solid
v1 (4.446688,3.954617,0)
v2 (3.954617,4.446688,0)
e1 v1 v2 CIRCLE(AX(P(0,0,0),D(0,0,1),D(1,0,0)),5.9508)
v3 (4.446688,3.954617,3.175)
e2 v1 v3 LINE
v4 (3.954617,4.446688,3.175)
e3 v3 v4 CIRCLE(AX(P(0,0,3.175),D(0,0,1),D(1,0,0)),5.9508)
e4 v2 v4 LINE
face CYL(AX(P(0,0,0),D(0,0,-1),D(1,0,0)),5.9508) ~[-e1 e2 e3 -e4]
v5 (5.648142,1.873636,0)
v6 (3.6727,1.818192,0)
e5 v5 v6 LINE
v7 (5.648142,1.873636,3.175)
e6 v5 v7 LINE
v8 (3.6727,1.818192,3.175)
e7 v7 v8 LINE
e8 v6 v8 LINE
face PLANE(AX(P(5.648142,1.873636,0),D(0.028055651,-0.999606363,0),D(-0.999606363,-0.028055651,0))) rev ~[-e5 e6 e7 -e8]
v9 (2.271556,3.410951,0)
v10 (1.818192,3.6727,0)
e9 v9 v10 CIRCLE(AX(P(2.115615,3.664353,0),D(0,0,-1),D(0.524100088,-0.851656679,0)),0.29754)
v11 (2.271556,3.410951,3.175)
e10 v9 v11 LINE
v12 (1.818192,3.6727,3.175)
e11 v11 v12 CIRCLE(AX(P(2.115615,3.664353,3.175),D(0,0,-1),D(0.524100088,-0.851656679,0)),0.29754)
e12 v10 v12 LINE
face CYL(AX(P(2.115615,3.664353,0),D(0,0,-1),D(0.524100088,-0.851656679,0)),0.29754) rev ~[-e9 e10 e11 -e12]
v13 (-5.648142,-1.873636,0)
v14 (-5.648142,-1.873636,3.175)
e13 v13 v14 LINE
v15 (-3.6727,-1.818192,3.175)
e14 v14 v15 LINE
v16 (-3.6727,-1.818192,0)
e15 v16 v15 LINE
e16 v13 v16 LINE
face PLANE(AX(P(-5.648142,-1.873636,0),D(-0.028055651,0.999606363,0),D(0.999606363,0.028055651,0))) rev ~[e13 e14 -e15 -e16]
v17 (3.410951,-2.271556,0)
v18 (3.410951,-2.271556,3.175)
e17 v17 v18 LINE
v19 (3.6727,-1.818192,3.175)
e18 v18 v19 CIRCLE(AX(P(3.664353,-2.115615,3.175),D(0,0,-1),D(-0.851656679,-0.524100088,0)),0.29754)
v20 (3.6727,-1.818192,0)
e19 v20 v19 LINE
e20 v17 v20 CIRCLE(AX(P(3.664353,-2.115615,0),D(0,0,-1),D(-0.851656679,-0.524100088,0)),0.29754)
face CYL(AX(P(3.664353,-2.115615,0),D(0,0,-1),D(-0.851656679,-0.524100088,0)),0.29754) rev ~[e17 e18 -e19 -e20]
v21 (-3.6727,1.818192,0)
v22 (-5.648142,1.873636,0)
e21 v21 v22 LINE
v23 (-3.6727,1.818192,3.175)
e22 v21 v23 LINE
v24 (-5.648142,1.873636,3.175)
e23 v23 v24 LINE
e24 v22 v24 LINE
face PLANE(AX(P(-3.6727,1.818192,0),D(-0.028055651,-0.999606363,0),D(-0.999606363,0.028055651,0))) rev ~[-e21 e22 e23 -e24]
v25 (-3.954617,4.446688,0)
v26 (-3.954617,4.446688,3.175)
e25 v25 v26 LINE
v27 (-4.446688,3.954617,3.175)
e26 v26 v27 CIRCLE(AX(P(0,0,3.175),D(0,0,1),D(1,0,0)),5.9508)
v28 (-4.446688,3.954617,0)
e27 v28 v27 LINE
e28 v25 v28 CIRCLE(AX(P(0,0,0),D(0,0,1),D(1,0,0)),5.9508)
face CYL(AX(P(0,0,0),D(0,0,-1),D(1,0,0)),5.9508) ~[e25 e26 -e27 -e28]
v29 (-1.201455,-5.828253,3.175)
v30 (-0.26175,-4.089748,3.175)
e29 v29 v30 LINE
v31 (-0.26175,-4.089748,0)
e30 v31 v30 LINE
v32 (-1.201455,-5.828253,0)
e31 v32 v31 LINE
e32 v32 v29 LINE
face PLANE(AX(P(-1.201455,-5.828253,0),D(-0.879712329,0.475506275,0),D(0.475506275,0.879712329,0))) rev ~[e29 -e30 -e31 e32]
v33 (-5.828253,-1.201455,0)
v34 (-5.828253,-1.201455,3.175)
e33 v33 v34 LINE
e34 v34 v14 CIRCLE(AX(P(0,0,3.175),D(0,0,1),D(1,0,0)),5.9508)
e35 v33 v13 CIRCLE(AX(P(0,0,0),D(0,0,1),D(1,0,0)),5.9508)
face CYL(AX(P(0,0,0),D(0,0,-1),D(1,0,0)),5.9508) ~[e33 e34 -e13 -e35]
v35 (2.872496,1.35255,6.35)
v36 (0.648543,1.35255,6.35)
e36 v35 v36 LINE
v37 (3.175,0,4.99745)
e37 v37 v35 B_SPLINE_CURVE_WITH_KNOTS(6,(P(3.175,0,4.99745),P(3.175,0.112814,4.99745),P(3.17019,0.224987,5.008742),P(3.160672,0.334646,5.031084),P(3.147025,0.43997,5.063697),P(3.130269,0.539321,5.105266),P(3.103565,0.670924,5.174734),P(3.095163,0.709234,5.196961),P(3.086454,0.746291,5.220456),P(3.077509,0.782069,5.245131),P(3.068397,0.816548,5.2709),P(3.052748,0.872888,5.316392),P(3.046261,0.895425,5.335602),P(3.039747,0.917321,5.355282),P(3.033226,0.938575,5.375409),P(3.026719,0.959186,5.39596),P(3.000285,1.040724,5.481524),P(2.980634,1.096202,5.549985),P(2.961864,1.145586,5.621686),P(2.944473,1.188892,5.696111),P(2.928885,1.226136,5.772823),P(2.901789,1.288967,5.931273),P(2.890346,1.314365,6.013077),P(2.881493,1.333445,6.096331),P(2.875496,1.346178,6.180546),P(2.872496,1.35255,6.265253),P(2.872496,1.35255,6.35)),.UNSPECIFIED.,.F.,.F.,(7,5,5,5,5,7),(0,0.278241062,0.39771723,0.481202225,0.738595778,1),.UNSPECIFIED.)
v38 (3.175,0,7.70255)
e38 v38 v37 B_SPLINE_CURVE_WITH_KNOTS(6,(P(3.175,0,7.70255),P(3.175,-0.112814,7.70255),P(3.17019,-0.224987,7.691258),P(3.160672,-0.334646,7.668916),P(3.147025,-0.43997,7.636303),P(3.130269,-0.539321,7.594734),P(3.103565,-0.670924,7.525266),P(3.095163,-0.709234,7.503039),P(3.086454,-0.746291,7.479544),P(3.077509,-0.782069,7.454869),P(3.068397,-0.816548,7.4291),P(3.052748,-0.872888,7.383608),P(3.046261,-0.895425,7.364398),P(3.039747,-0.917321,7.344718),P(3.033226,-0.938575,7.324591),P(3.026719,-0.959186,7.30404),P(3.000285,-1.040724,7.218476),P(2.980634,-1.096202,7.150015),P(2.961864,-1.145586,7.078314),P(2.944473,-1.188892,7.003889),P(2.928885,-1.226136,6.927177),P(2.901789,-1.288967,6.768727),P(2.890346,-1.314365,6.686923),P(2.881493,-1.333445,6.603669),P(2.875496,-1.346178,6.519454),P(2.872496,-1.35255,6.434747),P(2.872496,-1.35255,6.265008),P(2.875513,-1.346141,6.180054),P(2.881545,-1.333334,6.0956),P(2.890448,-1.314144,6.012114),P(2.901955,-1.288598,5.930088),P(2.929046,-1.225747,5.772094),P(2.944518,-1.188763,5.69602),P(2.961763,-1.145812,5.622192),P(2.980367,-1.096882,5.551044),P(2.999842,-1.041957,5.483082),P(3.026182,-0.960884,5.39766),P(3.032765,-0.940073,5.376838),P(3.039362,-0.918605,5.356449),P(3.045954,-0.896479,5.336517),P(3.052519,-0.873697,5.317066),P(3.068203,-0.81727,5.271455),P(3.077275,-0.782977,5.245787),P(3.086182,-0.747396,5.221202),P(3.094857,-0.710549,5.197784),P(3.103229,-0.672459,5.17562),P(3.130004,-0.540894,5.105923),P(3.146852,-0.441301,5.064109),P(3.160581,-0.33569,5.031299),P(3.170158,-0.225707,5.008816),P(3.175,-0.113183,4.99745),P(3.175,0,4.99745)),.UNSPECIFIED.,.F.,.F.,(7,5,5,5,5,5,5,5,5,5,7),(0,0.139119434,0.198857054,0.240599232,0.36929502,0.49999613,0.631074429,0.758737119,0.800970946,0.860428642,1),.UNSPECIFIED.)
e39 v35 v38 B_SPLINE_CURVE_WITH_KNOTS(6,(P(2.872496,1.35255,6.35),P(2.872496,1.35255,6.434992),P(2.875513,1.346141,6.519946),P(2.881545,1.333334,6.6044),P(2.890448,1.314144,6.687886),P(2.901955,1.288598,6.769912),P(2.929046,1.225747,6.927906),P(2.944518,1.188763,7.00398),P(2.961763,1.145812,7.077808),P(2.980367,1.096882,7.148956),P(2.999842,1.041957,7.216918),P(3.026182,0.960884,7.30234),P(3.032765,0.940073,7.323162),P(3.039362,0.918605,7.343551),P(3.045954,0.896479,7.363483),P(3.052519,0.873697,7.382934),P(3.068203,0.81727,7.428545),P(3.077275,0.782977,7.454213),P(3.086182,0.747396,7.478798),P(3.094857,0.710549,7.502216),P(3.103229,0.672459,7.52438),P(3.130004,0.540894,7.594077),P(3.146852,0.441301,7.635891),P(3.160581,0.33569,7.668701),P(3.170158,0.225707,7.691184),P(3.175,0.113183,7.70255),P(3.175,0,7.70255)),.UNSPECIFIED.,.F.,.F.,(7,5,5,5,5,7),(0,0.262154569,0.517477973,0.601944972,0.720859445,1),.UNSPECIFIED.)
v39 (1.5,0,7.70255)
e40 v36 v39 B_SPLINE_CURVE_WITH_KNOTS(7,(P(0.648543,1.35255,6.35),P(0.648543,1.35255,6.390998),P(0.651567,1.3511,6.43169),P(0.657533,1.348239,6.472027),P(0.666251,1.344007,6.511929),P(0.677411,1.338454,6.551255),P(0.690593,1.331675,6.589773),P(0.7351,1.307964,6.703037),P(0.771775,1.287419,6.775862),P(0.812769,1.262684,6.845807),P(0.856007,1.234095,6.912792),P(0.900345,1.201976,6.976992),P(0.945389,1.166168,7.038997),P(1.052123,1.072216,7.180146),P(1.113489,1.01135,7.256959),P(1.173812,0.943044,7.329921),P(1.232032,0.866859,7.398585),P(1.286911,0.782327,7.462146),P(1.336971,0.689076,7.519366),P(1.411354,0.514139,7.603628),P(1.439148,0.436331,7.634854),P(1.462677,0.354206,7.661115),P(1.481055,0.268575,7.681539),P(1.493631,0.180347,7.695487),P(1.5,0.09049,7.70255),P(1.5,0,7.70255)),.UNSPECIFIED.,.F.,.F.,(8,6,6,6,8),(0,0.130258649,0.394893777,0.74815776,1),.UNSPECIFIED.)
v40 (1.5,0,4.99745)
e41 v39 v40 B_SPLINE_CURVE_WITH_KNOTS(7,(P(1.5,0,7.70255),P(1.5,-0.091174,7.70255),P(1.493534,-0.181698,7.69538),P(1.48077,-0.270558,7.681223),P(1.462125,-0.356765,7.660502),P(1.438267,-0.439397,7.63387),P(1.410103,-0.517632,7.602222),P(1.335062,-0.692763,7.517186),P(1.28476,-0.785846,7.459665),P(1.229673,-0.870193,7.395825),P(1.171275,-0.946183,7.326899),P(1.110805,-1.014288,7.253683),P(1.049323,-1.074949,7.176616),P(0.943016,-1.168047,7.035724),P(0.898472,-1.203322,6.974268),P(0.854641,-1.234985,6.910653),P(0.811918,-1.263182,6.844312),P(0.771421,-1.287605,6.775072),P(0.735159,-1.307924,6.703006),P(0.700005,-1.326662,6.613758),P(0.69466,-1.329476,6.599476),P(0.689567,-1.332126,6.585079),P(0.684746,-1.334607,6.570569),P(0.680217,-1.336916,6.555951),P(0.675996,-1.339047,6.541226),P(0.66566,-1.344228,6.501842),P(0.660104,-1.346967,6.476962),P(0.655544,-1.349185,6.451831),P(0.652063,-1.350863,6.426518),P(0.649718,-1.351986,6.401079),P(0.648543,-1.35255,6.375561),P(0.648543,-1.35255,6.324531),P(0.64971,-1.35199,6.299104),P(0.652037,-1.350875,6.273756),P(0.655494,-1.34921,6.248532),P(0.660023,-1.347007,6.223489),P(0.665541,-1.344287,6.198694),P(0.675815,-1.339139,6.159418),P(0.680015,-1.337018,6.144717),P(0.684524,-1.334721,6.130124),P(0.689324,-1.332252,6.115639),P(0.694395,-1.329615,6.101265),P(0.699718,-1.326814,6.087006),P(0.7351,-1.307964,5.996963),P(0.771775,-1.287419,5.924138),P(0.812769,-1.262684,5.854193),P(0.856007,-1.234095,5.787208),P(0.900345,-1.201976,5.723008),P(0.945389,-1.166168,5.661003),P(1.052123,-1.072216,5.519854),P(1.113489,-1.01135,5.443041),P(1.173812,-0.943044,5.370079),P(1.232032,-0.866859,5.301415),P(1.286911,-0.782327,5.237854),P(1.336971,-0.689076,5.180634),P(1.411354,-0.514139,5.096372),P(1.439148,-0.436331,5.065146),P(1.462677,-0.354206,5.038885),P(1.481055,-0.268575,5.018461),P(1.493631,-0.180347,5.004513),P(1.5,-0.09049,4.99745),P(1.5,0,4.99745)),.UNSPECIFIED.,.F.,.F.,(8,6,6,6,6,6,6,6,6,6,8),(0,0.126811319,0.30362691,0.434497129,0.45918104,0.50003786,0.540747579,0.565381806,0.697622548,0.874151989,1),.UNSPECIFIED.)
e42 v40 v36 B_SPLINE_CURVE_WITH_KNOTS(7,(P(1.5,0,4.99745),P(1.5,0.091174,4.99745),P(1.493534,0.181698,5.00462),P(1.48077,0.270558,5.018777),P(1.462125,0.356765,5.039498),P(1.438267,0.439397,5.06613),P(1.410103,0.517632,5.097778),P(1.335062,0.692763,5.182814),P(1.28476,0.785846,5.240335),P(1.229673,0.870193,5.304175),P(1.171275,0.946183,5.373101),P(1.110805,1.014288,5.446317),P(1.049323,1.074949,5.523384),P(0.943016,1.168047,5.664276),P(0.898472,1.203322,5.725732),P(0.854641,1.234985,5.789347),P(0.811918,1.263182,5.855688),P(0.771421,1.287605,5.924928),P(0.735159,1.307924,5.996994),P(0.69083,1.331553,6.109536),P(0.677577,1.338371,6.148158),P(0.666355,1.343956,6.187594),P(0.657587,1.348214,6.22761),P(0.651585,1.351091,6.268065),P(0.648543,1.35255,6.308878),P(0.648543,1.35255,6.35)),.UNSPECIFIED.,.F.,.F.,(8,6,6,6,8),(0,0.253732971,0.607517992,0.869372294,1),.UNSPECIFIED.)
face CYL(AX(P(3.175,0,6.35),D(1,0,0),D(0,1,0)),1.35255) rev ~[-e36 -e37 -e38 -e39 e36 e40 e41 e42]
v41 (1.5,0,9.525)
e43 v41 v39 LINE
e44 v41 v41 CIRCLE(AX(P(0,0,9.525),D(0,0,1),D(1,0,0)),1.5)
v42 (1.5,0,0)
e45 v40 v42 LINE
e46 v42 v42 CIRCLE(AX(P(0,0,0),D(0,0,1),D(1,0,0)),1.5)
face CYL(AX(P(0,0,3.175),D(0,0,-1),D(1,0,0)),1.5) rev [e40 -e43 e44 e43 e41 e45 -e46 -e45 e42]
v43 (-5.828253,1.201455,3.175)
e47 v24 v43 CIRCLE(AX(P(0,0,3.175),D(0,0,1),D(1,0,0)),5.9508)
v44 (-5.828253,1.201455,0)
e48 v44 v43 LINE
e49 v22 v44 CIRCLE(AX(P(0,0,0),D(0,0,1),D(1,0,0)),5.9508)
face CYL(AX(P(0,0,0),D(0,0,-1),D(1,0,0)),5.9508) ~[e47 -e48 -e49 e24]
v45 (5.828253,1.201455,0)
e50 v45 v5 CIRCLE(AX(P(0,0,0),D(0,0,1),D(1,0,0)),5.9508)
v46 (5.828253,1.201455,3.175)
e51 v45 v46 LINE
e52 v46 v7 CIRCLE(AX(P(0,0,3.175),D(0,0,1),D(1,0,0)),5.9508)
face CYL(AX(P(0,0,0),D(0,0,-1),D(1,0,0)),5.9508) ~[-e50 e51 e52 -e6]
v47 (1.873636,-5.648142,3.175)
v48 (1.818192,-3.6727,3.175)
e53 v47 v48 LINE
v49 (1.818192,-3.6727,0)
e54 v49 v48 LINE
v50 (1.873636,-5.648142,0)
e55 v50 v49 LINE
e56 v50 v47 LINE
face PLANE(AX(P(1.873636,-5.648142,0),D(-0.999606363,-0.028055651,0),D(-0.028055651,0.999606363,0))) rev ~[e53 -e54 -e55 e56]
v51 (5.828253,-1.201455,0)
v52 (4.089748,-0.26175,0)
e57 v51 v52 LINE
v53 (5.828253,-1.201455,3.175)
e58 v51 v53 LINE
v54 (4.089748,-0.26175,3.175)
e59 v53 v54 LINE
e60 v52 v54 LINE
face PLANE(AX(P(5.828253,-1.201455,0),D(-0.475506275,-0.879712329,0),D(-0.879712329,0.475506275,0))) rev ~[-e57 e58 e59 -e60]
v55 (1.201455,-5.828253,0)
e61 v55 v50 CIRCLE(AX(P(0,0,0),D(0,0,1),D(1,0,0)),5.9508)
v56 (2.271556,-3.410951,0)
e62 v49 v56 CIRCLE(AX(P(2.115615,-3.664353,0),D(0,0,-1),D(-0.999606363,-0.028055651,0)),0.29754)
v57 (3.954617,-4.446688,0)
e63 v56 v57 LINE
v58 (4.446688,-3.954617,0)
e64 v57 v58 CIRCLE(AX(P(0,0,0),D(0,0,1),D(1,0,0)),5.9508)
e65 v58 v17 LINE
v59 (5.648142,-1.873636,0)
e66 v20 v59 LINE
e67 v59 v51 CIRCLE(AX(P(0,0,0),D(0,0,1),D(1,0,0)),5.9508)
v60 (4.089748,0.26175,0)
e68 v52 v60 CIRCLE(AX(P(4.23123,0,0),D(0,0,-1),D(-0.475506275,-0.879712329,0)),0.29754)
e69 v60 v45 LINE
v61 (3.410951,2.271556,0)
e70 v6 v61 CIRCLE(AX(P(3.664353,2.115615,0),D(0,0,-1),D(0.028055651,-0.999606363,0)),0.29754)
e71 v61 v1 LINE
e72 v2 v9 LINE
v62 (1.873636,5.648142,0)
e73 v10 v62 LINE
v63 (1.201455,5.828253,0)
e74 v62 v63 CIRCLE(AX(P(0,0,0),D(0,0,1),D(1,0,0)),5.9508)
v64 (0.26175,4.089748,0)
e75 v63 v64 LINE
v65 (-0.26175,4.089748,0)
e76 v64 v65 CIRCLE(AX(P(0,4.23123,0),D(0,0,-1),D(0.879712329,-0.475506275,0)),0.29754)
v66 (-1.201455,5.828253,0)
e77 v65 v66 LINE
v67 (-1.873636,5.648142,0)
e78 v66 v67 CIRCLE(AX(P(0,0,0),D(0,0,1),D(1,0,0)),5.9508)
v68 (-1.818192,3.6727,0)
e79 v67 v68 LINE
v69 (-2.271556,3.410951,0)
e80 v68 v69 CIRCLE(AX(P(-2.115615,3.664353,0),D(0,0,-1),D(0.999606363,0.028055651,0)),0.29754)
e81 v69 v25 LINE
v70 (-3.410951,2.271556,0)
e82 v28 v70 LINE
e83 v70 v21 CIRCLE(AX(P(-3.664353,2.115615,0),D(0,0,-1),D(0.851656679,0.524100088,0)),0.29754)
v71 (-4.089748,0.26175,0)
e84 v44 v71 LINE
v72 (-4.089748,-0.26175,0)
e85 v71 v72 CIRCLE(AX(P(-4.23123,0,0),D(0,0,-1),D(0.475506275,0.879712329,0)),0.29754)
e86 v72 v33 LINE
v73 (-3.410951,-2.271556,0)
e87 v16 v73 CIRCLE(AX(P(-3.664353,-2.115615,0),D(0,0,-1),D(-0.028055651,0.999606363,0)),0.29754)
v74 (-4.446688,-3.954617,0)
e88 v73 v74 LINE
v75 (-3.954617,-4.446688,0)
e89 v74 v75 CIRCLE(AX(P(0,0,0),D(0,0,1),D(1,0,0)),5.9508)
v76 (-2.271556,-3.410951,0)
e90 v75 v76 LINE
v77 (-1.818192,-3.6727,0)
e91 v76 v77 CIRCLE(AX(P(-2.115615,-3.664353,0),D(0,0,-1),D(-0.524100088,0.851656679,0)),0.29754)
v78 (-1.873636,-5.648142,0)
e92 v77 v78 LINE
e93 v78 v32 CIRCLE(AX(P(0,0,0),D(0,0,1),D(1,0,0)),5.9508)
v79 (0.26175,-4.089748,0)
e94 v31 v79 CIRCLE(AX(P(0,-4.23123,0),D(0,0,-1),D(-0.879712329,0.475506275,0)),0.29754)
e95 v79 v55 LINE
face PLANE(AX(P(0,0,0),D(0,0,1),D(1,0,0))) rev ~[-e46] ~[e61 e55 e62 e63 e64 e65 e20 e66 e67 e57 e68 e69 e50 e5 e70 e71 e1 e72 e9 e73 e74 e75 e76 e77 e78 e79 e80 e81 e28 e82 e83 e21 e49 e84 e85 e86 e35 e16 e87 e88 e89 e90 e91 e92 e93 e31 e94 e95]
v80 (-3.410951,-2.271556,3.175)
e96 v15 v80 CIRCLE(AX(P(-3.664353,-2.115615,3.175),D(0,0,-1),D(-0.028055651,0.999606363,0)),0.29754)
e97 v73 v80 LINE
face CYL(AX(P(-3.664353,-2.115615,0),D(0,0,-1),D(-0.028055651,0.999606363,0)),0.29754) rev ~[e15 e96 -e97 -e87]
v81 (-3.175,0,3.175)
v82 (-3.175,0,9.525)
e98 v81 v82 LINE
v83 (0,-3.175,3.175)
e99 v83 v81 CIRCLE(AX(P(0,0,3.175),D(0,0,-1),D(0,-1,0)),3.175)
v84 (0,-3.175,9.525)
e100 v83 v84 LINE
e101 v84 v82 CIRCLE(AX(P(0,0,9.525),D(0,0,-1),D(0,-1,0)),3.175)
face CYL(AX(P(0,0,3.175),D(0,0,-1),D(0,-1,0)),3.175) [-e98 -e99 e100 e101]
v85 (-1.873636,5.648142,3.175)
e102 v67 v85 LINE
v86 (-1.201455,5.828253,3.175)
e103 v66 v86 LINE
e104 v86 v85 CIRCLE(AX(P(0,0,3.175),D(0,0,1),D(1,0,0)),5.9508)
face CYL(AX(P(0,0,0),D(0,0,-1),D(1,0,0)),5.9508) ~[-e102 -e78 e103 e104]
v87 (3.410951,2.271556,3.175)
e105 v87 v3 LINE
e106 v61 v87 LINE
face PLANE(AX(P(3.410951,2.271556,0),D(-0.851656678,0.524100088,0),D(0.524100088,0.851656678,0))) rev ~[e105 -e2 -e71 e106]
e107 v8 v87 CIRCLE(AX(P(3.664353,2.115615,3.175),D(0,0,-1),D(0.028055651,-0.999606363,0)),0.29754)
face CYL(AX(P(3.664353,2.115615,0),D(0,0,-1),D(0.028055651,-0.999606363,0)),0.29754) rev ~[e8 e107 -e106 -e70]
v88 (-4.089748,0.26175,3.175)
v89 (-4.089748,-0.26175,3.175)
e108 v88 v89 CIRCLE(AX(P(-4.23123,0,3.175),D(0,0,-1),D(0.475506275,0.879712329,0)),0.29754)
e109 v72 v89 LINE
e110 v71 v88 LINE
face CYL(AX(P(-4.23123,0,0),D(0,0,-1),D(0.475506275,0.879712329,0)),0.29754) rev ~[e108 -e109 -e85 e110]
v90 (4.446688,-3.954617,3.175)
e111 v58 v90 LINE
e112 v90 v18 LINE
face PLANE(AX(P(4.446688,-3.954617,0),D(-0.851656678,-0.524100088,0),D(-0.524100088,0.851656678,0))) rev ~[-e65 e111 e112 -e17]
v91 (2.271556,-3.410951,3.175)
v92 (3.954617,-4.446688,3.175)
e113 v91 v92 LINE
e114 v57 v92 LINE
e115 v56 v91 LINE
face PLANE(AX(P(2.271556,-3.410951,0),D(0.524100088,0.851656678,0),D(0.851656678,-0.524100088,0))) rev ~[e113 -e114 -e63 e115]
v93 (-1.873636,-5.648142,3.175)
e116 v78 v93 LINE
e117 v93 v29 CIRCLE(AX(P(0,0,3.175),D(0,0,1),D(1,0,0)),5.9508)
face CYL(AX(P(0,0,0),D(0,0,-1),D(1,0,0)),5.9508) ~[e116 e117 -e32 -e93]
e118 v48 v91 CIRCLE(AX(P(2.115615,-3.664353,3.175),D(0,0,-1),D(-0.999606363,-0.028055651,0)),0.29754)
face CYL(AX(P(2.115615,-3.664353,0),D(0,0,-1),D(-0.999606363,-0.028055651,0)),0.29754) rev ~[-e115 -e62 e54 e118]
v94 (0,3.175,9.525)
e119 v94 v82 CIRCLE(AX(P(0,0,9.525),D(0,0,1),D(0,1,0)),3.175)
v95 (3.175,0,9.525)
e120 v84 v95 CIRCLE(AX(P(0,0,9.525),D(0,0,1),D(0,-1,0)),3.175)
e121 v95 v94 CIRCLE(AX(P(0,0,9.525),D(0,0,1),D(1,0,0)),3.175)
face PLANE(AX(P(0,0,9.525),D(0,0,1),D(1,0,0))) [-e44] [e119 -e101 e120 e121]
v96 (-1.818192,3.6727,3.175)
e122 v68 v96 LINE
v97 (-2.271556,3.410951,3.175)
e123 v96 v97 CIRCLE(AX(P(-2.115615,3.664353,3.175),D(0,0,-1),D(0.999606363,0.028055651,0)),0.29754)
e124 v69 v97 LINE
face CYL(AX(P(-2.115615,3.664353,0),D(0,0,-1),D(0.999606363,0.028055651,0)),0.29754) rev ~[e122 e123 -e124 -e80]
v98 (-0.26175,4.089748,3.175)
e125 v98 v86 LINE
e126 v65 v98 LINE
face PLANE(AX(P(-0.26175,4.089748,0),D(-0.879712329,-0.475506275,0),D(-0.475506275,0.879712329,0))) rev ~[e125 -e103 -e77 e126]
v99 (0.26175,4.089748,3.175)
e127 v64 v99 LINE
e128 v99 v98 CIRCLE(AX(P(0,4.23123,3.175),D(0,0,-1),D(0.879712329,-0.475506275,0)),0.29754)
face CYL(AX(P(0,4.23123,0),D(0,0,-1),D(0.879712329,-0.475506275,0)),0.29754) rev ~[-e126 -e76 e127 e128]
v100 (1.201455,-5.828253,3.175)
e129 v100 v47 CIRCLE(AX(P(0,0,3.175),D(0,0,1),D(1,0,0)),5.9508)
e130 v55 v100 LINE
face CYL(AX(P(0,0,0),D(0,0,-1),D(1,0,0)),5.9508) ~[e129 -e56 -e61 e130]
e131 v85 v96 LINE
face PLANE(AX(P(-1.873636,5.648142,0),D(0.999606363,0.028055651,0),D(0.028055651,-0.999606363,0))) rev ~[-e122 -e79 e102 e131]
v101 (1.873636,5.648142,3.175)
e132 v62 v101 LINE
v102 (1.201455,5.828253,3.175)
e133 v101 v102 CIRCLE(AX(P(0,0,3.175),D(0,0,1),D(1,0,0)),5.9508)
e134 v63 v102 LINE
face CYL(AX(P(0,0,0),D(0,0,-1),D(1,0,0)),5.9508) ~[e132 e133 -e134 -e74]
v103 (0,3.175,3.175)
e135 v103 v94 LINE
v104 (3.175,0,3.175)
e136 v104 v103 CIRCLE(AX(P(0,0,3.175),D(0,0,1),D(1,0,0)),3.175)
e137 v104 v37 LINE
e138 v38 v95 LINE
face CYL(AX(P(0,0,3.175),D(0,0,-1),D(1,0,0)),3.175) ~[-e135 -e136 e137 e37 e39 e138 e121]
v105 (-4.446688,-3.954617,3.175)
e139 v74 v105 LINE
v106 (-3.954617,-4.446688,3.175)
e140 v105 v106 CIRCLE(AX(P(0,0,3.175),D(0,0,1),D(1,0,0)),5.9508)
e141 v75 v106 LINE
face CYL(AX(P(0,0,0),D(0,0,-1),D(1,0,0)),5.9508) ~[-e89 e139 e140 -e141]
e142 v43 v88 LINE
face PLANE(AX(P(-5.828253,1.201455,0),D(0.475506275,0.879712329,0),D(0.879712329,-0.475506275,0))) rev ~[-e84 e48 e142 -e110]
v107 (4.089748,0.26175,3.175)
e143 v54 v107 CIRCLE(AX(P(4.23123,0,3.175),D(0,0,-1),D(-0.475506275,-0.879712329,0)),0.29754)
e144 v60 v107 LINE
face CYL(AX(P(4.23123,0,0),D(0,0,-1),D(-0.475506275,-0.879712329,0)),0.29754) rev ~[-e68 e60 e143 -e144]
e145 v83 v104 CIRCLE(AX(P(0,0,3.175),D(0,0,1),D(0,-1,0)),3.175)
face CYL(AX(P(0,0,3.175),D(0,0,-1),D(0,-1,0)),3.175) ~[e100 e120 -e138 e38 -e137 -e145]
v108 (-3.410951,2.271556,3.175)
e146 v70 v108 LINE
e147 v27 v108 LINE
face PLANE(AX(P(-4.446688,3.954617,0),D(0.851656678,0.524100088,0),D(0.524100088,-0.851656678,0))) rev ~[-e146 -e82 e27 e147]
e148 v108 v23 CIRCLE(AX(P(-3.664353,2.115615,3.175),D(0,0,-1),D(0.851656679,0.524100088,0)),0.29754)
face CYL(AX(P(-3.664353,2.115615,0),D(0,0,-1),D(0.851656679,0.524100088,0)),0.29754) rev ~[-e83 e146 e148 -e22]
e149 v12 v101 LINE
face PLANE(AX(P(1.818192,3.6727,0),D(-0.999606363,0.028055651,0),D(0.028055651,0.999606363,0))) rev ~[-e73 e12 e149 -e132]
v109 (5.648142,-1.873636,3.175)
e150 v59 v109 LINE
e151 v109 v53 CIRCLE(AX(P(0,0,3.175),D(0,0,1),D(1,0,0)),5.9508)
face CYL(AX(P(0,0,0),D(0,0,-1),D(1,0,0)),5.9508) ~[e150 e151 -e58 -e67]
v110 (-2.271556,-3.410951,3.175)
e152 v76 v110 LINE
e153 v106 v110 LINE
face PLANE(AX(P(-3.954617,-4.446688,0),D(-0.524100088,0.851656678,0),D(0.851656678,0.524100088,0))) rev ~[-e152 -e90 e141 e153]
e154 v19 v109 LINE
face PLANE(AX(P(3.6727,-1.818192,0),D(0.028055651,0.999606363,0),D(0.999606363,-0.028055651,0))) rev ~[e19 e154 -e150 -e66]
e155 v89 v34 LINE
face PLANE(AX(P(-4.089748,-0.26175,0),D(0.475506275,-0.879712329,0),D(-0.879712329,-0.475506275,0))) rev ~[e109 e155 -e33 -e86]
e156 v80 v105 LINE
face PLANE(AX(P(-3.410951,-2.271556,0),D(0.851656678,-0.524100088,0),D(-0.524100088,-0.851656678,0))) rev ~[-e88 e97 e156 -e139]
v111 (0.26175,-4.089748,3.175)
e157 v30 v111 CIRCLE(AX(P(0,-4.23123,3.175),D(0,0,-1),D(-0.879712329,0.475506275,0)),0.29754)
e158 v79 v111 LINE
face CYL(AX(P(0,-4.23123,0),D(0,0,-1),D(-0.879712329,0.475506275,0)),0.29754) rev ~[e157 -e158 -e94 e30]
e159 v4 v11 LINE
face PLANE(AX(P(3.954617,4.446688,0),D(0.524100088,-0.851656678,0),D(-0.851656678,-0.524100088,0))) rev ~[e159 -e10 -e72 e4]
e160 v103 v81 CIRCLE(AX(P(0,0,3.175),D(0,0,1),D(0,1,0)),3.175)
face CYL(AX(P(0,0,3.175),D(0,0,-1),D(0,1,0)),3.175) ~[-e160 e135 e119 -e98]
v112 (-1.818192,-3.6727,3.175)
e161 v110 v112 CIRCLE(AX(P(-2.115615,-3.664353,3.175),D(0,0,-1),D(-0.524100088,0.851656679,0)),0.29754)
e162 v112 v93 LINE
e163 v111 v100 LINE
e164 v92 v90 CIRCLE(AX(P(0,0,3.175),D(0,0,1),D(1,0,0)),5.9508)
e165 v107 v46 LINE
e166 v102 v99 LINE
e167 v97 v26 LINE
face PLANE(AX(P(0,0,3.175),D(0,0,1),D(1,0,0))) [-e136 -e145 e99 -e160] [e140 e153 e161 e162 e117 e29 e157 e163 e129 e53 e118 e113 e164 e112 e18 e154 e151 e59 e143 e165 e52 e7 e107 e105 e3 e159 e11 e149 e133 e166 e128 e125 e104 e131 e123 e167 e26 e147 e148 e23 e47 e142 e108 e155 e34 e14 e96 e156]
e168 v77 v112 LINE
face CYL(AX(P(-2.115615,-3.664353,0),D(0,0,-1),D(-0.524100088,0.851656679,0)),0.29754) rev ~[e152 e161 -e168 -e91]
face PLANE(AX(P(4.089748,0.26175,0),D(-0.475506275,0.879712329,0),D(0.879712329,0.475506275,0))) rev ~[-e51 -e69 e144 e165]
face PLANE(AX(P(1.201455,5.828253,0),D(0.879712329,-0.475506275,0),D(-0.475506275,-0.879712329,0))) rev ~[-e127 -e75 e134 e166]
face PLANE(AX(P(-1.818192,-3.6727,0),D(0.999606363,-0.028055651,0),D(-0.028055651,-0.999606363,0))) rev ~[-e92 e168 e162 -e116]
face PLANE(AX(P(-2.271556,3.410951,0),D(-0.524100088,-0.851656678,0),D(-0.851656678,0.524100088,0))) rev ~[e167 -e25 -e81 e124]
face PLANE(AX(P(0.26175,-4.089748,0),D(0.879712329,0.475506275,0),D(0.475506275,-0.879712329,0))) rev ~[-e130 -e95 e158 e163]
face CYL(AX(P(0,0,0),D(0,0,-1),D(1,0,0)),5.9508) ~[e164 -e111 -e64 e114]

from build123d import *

# Parameters (mm, degrees)
F0_R        = 5.9508004686
F0_R_2      = 1.5
F1_DEPTH    = 3.175
F2_W        = 6.35
F2_H        = 6.35
F2_R        = 1.5
F3_DEPTH    = 6.35
F4_R        = 1.35255
F5_REACH    = 12.9523895761
F6_T1_DEPTH = 6.35
F8_DEPTH    = 3.175
F9_COUNT    = 12
F9_ANGLE    = 330


# Not quite as in the source:
# - a fillet or chamfer that OpenCascade refuses, or shapes differently, is made with other operations: its cross-section is extruded or revolved along the edge and cut away or added


with BuildPart() as f1:
    # F0 (on Top) → F1 (new body)
    with BuildSketch(Plane.XY):
        Circle(F0_R)
        Circle(F0_R_2, mode=Mode.SUBTRACT)
    extrude(amount=F1_DEPTH)

    # F2 (on face) → F3 (join)
    with BuildSketch(Plane.XY.offset(3.175)):
        Rectangle(F2_W, F2_H)
        Circle(F2_R, mode=Mode.SUBTRACT)
    extrude(amount=F3_DEPTH)

    f5_end = f1.faces().sort_by_distance((-1.5, 0, 4.7625))[0]
    # F4 (on face) → F5 (cut, up to a face of the model that its end follows)
    with BuildSketch(Plane.YZ.offset(3.175)):
        with Locations((0, 6.35)):
            Circle(F4_R)
    f5_long = extrude(amount=-F5_REACH, mode=Mode.PRIVATE)
    add(split(f5_long, bisect_by=f5_end, keep=Keep.ALL, mode=Mode.PRIVATE).solids().sort_by_distance((3.175, 0, 6.35))[0], mode=Mode.SUBTRACT)

    # F6: fillet of radius 3.175 on 4 edges, made by hand

    # F6_s2 → F6_t1 (cut)
    with BuildSketch(Plane.XY.offset(3.175)):
        with BuildLine():
            ThreePointArc((0, -3.175), (2.2450640303, -2.2450640303), (3.175, 0))
            Line((3.175, 0), (3.2385, 0))
            Line((3.2385, 0), (3.2385, -3.2385))
            Line((3.2385, -3.2385), (0, -3.2385))
            Line((0, -3.2385), (0, -3.175))
        make_face()
        with BuildLine():
            ThreePointArc((0, -3.175), (-2.2450640303, -2.2450640303), (-3.175, 0))
            Line((-3.175, 0), (-3.2385, 0))
            Line((-3.2385, 0), (-3.2385, -3.2385))
            Line((-3.2385, -3.2385), (0, -3.2385))
            Line((0, -3.2385), (0, -3.175))
        make_face()
        with BuildLine():
            ThreePointArc((3.175, 0), (2.2450640303, 2.2450640303), (0, 3.175))
            Line((0, 3.175), (0, 3.2385))
            Line((0, 3.2385), (3.2385, 3.2385))
            Line((3.2385, 3.2385), (3.2385, 0))
            Line((3.2385, 0), (3.175, 0))
        make_face()
        with BuildLine():
            ThreePointArc((0, 3.175), (-2.2450640303, 2.2450640303), (-3.175, 0))
            Line((-3.175, 0), (-3.2385, 0))
            Line((-3.2385, 0), (-3.2385, 3.2385))
            Line((-3.2385, 3.2385), (0, 3.2385))
            Line((0, 3.2385), (0, 3.175))
        make_face()
    extrude(amount=F6_T1_DEPTH, mode=Mode.SUBTRACT)

    # F7 (on face) → F8 (cut, through all)
    with BuildSketch(Plane(origin=(0, 0, 0), x_dir=(1, 0, 0), z_dir=(0, 0, -1))):
        with BuildLine():
            Line((4.0897477961, -0.2617496271), (5.8282529848, -1.2014546857))
            ThreePointArc((5.8282529848, -1.2014546857), (5.9508004686, 0), (5.8282529848, 1.2014546857))
            Line((5.8282529848, 1.2014546857), (4.0897477961, 0.2617496271))
            ThreePointArc((4.0897477961, 0.2617496271), (3.9336899209, 0), (4.0897477961, -0.2617496271))
        make_face()
    f8 = extrude(amount=-F8_DEPTH, mode=Mode.SUBTRACT)

    # F9: F8 ×12 about axis
    f9_axis = Axis((0, 0, 0), (0, 0, -1))
    for i in range(1, F9_COUNT):
        add(f8.rotate(f9_axis, i * F9_ANGLE / (F9_COUNT - 1)), mode=Mode.SUBTRACT)


solid = f1.part
